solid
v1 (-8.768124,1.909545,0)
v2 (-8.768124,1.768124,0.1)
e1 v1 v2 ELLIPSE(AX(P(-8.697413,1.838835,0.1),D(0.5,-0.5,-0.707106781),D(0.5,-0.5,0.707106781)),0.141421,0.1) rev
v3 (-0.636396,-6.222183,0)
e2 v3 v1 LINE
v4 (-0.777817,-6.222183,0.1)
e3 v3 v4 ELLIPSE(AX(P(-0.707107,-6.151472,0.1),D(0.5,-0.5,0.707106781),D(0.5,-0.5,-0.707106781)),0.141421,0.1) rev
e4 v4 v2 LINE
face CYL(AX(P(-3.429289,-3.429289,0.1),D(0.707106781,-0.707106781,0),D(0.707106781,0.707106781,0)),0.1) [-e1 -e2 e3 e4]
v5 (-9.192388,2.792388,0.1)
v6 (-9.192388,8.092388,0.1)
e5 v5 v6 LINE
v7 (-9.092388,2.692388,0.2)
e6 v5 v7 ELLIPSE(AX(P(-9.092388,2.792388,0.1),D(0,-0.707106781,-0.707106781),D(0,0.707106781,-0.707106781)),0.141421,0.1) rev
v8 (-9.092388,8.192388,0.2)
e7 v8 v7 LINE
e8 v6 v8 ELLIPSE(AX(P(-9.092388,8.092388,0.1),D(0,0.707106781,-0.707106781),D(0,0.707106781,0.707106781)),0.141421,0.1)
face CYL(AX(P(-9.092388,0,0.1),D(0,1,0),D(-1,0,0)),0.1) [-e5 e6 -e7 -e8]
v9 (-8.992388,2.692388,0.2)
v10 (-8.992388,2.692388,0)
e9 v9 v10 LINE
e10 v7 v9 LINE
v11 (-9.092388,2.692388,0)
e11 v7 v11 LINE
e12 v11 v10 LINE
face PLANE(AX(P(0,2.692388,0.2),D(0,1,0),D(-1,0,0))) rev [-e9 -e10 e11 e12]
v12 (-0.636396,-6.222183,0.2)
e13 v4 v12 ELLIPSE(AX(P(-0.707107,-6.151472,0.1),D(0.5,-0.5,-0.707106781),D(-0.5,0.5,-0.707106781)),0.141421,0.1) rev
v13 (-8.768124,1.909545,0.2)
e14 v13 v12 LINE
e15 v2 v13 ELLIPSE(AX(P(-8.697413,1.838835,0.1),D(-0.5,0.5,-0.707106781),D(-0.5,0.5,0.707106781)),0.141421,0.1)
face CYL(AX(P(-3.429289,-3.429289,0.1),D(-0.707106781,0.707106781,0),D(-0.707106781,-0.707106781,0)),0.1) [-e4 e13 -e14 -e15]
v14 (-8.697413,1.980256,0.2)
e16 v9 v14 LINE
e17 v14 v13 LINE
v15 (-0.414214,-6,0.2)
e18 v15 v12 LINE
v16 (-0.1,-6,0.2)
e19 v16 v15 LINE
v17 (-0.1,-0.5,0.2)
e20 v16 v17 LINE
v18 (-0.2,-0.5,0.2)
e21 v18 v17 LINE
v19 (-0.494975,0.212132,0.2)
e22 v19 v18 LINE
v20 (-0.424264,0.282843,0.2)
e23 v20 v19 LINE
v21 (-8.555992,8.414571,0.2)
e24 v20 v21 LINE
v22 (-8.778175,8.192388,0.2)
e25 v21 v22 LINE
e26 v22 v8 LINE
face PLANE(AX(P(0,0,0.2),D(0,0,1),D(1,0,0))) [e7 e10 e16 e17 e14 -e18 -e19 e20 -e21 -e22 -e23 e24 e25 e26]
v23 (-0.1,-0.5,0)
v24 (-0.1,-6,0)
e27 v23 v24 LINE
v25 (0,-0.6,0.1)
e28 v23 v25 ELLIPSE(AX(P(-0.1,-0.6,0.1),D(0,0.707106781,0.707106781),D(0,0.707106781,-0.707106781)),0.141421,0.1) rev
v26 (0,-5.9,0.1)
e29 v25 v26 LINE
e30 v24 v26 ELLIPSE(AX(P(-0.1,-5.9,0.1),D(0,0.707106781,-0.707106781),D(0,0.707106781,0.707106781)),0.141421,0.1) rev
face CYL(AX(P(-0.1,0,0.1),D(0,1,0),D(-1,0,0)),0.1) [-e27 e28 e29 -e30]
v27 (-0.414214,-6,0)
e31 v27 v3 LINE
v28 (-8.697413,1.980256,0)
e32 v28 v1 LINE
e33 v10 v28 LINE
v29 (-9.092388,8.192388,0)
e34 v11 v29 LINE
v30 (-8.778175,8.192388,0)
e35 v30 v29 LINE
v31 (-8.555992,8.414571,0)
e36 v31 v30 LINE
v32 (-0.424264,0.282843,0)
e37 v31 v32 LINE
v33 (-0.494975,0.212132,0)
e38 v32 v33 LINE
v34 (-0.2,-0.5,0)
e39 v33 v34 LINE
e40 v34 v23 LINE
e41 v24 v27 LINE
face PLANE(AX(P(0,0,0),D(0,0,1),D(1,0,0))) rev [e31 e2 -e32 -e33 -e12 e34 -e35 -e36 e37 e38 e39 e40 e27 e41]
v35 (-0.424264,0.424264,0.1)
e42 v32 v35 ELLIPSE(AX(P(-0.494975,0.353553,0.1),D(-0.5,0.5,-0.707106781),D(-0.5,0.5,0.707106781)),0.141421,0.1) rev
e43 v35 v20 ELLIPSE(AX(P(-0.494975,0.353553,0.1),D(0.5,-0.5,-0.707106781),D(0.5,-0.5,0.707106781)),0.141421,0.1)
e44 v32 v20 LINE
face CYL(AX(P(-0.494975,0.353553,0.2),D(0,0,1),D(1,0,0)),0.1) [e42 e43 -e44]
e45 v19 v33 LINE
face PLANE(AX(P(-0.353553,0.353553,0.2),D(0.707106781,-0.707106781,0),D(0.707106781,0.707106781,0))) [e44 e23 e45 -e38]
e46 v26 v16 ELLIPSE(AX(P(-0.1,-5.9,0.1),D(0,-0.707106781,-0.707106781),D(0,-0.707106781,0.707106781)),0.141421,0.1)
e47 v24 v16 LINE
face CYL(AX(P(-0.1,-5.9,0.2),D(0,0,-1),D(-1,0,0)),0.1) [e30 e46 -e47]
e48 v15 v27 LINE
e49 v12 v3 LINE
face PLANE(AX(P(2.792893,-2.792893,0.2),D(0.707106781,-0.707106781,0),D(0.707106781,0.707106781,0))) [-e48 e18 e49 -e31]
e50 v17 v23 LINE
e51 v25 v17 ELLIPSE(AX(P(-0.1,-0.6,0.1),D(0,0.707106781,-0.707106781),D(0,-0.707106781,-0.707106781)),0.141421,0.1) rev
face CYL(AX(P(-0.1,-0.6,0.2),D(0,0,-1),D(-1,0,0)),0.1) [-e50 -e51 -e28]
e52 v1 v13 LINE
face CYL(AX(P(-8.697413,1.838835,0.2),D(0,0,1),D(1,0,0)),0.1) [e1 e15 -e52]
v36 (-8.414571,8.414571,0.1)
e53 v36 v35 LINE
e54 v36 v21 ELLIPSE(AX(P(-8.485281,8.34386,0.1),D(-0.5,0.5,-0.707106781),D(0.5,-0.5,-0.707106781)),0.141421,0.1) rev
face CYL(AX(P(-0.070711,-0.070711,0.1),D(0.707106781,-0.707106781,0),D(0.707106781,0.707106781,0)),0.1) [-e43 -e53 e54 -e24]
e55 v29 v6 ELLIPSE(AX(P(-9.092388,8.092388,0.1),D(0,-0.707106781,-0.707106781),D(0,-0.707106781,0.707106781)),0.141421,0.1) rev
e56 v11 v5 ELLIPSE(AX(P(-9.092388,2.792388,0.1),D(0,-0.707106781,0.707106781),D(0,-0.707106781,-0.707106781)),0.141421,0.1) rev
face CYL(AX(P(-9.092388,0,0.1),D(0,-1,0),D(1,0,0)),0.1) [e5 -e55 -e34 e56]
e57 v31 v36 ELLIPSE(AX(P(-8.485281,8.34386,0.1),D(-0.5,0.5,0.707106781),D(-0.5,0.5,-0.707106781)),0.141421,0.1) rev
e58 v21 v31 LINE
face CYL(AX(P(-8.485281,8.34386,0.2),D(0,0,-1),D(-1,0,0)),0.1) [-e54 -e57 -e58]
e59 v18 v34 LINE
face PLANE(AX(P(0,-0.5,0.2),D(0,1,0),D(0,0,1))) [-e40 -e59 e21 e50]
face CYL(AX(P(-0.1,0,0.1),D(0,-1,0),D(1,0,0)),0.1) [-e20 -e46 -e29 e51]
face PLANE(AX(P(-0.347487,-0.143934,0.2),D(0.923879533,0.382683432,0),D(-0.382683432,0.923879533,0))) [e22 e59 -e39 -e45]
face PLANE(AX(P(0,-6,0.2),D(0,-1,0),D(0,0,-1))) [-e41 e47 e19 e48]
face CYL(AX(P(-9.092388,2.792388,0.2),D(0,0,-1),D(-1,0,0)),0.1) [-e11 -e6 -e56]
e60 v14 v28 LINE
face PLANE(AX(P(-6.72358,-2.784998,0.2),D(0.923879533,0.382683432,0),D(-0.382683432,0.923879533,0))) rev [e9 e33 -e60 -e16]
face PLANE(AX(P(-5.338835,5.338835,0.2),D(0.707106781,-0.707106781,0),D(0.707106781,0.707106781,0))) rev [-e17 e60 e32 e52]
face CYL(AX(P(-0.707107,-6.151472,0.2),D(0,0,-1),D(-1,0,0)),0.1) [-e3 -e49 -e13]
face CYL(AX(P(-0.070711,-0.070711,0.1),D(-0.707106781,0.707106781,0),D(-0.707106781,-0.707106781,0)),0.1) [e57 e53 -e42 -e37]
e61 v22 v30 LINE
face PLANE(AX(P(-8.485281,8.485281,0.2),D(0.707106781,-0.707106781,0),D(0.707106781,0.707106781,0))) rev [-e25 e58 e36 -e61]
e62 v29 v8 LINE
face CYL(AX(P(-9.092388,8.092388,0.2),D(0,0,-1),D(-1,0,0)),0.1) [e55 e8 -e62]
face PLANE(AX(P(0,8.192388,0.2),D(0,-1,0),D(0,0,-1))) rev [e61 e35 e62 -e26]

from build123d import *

# Parameters (mm, degrees)
EXTRUDE_1_DEPTH = 0.2
FILLET_1_R      = 0.1


with BuildPart() as part:
    # 草图1 → 凸台-拉伸1 (new body)
    with BuildSketch(Plane.XY):
        Polygon((0, -6), (0, -0.5), (-0.2, -0.5), (-0.494974747, 0.212132034), (-0.353553391, 0.353553391), (-8.485281374, 8.485281374), (-8.778174593, 8.192388155), (-9.192388155, 8.192388155), (-9.192388155, 2.692388155), (-8.992388155, 2.692388155), (-8.697413409, 1.980256121), (-8.838834765, 1.838834765), (-0.707106781, -6.292893219), (-0.414213562, -6), align=None)
    extrude(amount=EXTRUDE_1_DEPTH)

    # 圆角1
    fillet_1_edges = [part.edges().sort_by_distance(p)[0] for p in [
        (-9.192388155, 5.442388155, 0),
        (-4.419417382, 4.419417382, 0),
        (-4.772970773, -2.227029227, 0.2),
        (0, -3.25, 0),
        (-4.772970773, -2.227029227, 0),
        (-9.192388155, 2.692388155, 0.1),
        (-9.192388155, 8.192388155, 0.1),
        (-8.485281374, 8.485281374, 0.1),
        (-0.353553391, 0.353553391, 0.1),
        (0, -0.5, 0.1),
        (0, -6, 0.1),
        (-0.707106781, -6.292893219, 0.1),
        (-8.838834765, 1.838834765, 0.1),
        (0, -3.25, 0.2),
        (-4.419417382, 4.419417382, 0.2),
        (-9.192388155, 5.442388155, 0.2),
    ]]
    fillet(fillet_1_edges, radius=FILLET_1_R - 0.0001)  # a hair under: the kernel refuses the full size


solid = part.part
